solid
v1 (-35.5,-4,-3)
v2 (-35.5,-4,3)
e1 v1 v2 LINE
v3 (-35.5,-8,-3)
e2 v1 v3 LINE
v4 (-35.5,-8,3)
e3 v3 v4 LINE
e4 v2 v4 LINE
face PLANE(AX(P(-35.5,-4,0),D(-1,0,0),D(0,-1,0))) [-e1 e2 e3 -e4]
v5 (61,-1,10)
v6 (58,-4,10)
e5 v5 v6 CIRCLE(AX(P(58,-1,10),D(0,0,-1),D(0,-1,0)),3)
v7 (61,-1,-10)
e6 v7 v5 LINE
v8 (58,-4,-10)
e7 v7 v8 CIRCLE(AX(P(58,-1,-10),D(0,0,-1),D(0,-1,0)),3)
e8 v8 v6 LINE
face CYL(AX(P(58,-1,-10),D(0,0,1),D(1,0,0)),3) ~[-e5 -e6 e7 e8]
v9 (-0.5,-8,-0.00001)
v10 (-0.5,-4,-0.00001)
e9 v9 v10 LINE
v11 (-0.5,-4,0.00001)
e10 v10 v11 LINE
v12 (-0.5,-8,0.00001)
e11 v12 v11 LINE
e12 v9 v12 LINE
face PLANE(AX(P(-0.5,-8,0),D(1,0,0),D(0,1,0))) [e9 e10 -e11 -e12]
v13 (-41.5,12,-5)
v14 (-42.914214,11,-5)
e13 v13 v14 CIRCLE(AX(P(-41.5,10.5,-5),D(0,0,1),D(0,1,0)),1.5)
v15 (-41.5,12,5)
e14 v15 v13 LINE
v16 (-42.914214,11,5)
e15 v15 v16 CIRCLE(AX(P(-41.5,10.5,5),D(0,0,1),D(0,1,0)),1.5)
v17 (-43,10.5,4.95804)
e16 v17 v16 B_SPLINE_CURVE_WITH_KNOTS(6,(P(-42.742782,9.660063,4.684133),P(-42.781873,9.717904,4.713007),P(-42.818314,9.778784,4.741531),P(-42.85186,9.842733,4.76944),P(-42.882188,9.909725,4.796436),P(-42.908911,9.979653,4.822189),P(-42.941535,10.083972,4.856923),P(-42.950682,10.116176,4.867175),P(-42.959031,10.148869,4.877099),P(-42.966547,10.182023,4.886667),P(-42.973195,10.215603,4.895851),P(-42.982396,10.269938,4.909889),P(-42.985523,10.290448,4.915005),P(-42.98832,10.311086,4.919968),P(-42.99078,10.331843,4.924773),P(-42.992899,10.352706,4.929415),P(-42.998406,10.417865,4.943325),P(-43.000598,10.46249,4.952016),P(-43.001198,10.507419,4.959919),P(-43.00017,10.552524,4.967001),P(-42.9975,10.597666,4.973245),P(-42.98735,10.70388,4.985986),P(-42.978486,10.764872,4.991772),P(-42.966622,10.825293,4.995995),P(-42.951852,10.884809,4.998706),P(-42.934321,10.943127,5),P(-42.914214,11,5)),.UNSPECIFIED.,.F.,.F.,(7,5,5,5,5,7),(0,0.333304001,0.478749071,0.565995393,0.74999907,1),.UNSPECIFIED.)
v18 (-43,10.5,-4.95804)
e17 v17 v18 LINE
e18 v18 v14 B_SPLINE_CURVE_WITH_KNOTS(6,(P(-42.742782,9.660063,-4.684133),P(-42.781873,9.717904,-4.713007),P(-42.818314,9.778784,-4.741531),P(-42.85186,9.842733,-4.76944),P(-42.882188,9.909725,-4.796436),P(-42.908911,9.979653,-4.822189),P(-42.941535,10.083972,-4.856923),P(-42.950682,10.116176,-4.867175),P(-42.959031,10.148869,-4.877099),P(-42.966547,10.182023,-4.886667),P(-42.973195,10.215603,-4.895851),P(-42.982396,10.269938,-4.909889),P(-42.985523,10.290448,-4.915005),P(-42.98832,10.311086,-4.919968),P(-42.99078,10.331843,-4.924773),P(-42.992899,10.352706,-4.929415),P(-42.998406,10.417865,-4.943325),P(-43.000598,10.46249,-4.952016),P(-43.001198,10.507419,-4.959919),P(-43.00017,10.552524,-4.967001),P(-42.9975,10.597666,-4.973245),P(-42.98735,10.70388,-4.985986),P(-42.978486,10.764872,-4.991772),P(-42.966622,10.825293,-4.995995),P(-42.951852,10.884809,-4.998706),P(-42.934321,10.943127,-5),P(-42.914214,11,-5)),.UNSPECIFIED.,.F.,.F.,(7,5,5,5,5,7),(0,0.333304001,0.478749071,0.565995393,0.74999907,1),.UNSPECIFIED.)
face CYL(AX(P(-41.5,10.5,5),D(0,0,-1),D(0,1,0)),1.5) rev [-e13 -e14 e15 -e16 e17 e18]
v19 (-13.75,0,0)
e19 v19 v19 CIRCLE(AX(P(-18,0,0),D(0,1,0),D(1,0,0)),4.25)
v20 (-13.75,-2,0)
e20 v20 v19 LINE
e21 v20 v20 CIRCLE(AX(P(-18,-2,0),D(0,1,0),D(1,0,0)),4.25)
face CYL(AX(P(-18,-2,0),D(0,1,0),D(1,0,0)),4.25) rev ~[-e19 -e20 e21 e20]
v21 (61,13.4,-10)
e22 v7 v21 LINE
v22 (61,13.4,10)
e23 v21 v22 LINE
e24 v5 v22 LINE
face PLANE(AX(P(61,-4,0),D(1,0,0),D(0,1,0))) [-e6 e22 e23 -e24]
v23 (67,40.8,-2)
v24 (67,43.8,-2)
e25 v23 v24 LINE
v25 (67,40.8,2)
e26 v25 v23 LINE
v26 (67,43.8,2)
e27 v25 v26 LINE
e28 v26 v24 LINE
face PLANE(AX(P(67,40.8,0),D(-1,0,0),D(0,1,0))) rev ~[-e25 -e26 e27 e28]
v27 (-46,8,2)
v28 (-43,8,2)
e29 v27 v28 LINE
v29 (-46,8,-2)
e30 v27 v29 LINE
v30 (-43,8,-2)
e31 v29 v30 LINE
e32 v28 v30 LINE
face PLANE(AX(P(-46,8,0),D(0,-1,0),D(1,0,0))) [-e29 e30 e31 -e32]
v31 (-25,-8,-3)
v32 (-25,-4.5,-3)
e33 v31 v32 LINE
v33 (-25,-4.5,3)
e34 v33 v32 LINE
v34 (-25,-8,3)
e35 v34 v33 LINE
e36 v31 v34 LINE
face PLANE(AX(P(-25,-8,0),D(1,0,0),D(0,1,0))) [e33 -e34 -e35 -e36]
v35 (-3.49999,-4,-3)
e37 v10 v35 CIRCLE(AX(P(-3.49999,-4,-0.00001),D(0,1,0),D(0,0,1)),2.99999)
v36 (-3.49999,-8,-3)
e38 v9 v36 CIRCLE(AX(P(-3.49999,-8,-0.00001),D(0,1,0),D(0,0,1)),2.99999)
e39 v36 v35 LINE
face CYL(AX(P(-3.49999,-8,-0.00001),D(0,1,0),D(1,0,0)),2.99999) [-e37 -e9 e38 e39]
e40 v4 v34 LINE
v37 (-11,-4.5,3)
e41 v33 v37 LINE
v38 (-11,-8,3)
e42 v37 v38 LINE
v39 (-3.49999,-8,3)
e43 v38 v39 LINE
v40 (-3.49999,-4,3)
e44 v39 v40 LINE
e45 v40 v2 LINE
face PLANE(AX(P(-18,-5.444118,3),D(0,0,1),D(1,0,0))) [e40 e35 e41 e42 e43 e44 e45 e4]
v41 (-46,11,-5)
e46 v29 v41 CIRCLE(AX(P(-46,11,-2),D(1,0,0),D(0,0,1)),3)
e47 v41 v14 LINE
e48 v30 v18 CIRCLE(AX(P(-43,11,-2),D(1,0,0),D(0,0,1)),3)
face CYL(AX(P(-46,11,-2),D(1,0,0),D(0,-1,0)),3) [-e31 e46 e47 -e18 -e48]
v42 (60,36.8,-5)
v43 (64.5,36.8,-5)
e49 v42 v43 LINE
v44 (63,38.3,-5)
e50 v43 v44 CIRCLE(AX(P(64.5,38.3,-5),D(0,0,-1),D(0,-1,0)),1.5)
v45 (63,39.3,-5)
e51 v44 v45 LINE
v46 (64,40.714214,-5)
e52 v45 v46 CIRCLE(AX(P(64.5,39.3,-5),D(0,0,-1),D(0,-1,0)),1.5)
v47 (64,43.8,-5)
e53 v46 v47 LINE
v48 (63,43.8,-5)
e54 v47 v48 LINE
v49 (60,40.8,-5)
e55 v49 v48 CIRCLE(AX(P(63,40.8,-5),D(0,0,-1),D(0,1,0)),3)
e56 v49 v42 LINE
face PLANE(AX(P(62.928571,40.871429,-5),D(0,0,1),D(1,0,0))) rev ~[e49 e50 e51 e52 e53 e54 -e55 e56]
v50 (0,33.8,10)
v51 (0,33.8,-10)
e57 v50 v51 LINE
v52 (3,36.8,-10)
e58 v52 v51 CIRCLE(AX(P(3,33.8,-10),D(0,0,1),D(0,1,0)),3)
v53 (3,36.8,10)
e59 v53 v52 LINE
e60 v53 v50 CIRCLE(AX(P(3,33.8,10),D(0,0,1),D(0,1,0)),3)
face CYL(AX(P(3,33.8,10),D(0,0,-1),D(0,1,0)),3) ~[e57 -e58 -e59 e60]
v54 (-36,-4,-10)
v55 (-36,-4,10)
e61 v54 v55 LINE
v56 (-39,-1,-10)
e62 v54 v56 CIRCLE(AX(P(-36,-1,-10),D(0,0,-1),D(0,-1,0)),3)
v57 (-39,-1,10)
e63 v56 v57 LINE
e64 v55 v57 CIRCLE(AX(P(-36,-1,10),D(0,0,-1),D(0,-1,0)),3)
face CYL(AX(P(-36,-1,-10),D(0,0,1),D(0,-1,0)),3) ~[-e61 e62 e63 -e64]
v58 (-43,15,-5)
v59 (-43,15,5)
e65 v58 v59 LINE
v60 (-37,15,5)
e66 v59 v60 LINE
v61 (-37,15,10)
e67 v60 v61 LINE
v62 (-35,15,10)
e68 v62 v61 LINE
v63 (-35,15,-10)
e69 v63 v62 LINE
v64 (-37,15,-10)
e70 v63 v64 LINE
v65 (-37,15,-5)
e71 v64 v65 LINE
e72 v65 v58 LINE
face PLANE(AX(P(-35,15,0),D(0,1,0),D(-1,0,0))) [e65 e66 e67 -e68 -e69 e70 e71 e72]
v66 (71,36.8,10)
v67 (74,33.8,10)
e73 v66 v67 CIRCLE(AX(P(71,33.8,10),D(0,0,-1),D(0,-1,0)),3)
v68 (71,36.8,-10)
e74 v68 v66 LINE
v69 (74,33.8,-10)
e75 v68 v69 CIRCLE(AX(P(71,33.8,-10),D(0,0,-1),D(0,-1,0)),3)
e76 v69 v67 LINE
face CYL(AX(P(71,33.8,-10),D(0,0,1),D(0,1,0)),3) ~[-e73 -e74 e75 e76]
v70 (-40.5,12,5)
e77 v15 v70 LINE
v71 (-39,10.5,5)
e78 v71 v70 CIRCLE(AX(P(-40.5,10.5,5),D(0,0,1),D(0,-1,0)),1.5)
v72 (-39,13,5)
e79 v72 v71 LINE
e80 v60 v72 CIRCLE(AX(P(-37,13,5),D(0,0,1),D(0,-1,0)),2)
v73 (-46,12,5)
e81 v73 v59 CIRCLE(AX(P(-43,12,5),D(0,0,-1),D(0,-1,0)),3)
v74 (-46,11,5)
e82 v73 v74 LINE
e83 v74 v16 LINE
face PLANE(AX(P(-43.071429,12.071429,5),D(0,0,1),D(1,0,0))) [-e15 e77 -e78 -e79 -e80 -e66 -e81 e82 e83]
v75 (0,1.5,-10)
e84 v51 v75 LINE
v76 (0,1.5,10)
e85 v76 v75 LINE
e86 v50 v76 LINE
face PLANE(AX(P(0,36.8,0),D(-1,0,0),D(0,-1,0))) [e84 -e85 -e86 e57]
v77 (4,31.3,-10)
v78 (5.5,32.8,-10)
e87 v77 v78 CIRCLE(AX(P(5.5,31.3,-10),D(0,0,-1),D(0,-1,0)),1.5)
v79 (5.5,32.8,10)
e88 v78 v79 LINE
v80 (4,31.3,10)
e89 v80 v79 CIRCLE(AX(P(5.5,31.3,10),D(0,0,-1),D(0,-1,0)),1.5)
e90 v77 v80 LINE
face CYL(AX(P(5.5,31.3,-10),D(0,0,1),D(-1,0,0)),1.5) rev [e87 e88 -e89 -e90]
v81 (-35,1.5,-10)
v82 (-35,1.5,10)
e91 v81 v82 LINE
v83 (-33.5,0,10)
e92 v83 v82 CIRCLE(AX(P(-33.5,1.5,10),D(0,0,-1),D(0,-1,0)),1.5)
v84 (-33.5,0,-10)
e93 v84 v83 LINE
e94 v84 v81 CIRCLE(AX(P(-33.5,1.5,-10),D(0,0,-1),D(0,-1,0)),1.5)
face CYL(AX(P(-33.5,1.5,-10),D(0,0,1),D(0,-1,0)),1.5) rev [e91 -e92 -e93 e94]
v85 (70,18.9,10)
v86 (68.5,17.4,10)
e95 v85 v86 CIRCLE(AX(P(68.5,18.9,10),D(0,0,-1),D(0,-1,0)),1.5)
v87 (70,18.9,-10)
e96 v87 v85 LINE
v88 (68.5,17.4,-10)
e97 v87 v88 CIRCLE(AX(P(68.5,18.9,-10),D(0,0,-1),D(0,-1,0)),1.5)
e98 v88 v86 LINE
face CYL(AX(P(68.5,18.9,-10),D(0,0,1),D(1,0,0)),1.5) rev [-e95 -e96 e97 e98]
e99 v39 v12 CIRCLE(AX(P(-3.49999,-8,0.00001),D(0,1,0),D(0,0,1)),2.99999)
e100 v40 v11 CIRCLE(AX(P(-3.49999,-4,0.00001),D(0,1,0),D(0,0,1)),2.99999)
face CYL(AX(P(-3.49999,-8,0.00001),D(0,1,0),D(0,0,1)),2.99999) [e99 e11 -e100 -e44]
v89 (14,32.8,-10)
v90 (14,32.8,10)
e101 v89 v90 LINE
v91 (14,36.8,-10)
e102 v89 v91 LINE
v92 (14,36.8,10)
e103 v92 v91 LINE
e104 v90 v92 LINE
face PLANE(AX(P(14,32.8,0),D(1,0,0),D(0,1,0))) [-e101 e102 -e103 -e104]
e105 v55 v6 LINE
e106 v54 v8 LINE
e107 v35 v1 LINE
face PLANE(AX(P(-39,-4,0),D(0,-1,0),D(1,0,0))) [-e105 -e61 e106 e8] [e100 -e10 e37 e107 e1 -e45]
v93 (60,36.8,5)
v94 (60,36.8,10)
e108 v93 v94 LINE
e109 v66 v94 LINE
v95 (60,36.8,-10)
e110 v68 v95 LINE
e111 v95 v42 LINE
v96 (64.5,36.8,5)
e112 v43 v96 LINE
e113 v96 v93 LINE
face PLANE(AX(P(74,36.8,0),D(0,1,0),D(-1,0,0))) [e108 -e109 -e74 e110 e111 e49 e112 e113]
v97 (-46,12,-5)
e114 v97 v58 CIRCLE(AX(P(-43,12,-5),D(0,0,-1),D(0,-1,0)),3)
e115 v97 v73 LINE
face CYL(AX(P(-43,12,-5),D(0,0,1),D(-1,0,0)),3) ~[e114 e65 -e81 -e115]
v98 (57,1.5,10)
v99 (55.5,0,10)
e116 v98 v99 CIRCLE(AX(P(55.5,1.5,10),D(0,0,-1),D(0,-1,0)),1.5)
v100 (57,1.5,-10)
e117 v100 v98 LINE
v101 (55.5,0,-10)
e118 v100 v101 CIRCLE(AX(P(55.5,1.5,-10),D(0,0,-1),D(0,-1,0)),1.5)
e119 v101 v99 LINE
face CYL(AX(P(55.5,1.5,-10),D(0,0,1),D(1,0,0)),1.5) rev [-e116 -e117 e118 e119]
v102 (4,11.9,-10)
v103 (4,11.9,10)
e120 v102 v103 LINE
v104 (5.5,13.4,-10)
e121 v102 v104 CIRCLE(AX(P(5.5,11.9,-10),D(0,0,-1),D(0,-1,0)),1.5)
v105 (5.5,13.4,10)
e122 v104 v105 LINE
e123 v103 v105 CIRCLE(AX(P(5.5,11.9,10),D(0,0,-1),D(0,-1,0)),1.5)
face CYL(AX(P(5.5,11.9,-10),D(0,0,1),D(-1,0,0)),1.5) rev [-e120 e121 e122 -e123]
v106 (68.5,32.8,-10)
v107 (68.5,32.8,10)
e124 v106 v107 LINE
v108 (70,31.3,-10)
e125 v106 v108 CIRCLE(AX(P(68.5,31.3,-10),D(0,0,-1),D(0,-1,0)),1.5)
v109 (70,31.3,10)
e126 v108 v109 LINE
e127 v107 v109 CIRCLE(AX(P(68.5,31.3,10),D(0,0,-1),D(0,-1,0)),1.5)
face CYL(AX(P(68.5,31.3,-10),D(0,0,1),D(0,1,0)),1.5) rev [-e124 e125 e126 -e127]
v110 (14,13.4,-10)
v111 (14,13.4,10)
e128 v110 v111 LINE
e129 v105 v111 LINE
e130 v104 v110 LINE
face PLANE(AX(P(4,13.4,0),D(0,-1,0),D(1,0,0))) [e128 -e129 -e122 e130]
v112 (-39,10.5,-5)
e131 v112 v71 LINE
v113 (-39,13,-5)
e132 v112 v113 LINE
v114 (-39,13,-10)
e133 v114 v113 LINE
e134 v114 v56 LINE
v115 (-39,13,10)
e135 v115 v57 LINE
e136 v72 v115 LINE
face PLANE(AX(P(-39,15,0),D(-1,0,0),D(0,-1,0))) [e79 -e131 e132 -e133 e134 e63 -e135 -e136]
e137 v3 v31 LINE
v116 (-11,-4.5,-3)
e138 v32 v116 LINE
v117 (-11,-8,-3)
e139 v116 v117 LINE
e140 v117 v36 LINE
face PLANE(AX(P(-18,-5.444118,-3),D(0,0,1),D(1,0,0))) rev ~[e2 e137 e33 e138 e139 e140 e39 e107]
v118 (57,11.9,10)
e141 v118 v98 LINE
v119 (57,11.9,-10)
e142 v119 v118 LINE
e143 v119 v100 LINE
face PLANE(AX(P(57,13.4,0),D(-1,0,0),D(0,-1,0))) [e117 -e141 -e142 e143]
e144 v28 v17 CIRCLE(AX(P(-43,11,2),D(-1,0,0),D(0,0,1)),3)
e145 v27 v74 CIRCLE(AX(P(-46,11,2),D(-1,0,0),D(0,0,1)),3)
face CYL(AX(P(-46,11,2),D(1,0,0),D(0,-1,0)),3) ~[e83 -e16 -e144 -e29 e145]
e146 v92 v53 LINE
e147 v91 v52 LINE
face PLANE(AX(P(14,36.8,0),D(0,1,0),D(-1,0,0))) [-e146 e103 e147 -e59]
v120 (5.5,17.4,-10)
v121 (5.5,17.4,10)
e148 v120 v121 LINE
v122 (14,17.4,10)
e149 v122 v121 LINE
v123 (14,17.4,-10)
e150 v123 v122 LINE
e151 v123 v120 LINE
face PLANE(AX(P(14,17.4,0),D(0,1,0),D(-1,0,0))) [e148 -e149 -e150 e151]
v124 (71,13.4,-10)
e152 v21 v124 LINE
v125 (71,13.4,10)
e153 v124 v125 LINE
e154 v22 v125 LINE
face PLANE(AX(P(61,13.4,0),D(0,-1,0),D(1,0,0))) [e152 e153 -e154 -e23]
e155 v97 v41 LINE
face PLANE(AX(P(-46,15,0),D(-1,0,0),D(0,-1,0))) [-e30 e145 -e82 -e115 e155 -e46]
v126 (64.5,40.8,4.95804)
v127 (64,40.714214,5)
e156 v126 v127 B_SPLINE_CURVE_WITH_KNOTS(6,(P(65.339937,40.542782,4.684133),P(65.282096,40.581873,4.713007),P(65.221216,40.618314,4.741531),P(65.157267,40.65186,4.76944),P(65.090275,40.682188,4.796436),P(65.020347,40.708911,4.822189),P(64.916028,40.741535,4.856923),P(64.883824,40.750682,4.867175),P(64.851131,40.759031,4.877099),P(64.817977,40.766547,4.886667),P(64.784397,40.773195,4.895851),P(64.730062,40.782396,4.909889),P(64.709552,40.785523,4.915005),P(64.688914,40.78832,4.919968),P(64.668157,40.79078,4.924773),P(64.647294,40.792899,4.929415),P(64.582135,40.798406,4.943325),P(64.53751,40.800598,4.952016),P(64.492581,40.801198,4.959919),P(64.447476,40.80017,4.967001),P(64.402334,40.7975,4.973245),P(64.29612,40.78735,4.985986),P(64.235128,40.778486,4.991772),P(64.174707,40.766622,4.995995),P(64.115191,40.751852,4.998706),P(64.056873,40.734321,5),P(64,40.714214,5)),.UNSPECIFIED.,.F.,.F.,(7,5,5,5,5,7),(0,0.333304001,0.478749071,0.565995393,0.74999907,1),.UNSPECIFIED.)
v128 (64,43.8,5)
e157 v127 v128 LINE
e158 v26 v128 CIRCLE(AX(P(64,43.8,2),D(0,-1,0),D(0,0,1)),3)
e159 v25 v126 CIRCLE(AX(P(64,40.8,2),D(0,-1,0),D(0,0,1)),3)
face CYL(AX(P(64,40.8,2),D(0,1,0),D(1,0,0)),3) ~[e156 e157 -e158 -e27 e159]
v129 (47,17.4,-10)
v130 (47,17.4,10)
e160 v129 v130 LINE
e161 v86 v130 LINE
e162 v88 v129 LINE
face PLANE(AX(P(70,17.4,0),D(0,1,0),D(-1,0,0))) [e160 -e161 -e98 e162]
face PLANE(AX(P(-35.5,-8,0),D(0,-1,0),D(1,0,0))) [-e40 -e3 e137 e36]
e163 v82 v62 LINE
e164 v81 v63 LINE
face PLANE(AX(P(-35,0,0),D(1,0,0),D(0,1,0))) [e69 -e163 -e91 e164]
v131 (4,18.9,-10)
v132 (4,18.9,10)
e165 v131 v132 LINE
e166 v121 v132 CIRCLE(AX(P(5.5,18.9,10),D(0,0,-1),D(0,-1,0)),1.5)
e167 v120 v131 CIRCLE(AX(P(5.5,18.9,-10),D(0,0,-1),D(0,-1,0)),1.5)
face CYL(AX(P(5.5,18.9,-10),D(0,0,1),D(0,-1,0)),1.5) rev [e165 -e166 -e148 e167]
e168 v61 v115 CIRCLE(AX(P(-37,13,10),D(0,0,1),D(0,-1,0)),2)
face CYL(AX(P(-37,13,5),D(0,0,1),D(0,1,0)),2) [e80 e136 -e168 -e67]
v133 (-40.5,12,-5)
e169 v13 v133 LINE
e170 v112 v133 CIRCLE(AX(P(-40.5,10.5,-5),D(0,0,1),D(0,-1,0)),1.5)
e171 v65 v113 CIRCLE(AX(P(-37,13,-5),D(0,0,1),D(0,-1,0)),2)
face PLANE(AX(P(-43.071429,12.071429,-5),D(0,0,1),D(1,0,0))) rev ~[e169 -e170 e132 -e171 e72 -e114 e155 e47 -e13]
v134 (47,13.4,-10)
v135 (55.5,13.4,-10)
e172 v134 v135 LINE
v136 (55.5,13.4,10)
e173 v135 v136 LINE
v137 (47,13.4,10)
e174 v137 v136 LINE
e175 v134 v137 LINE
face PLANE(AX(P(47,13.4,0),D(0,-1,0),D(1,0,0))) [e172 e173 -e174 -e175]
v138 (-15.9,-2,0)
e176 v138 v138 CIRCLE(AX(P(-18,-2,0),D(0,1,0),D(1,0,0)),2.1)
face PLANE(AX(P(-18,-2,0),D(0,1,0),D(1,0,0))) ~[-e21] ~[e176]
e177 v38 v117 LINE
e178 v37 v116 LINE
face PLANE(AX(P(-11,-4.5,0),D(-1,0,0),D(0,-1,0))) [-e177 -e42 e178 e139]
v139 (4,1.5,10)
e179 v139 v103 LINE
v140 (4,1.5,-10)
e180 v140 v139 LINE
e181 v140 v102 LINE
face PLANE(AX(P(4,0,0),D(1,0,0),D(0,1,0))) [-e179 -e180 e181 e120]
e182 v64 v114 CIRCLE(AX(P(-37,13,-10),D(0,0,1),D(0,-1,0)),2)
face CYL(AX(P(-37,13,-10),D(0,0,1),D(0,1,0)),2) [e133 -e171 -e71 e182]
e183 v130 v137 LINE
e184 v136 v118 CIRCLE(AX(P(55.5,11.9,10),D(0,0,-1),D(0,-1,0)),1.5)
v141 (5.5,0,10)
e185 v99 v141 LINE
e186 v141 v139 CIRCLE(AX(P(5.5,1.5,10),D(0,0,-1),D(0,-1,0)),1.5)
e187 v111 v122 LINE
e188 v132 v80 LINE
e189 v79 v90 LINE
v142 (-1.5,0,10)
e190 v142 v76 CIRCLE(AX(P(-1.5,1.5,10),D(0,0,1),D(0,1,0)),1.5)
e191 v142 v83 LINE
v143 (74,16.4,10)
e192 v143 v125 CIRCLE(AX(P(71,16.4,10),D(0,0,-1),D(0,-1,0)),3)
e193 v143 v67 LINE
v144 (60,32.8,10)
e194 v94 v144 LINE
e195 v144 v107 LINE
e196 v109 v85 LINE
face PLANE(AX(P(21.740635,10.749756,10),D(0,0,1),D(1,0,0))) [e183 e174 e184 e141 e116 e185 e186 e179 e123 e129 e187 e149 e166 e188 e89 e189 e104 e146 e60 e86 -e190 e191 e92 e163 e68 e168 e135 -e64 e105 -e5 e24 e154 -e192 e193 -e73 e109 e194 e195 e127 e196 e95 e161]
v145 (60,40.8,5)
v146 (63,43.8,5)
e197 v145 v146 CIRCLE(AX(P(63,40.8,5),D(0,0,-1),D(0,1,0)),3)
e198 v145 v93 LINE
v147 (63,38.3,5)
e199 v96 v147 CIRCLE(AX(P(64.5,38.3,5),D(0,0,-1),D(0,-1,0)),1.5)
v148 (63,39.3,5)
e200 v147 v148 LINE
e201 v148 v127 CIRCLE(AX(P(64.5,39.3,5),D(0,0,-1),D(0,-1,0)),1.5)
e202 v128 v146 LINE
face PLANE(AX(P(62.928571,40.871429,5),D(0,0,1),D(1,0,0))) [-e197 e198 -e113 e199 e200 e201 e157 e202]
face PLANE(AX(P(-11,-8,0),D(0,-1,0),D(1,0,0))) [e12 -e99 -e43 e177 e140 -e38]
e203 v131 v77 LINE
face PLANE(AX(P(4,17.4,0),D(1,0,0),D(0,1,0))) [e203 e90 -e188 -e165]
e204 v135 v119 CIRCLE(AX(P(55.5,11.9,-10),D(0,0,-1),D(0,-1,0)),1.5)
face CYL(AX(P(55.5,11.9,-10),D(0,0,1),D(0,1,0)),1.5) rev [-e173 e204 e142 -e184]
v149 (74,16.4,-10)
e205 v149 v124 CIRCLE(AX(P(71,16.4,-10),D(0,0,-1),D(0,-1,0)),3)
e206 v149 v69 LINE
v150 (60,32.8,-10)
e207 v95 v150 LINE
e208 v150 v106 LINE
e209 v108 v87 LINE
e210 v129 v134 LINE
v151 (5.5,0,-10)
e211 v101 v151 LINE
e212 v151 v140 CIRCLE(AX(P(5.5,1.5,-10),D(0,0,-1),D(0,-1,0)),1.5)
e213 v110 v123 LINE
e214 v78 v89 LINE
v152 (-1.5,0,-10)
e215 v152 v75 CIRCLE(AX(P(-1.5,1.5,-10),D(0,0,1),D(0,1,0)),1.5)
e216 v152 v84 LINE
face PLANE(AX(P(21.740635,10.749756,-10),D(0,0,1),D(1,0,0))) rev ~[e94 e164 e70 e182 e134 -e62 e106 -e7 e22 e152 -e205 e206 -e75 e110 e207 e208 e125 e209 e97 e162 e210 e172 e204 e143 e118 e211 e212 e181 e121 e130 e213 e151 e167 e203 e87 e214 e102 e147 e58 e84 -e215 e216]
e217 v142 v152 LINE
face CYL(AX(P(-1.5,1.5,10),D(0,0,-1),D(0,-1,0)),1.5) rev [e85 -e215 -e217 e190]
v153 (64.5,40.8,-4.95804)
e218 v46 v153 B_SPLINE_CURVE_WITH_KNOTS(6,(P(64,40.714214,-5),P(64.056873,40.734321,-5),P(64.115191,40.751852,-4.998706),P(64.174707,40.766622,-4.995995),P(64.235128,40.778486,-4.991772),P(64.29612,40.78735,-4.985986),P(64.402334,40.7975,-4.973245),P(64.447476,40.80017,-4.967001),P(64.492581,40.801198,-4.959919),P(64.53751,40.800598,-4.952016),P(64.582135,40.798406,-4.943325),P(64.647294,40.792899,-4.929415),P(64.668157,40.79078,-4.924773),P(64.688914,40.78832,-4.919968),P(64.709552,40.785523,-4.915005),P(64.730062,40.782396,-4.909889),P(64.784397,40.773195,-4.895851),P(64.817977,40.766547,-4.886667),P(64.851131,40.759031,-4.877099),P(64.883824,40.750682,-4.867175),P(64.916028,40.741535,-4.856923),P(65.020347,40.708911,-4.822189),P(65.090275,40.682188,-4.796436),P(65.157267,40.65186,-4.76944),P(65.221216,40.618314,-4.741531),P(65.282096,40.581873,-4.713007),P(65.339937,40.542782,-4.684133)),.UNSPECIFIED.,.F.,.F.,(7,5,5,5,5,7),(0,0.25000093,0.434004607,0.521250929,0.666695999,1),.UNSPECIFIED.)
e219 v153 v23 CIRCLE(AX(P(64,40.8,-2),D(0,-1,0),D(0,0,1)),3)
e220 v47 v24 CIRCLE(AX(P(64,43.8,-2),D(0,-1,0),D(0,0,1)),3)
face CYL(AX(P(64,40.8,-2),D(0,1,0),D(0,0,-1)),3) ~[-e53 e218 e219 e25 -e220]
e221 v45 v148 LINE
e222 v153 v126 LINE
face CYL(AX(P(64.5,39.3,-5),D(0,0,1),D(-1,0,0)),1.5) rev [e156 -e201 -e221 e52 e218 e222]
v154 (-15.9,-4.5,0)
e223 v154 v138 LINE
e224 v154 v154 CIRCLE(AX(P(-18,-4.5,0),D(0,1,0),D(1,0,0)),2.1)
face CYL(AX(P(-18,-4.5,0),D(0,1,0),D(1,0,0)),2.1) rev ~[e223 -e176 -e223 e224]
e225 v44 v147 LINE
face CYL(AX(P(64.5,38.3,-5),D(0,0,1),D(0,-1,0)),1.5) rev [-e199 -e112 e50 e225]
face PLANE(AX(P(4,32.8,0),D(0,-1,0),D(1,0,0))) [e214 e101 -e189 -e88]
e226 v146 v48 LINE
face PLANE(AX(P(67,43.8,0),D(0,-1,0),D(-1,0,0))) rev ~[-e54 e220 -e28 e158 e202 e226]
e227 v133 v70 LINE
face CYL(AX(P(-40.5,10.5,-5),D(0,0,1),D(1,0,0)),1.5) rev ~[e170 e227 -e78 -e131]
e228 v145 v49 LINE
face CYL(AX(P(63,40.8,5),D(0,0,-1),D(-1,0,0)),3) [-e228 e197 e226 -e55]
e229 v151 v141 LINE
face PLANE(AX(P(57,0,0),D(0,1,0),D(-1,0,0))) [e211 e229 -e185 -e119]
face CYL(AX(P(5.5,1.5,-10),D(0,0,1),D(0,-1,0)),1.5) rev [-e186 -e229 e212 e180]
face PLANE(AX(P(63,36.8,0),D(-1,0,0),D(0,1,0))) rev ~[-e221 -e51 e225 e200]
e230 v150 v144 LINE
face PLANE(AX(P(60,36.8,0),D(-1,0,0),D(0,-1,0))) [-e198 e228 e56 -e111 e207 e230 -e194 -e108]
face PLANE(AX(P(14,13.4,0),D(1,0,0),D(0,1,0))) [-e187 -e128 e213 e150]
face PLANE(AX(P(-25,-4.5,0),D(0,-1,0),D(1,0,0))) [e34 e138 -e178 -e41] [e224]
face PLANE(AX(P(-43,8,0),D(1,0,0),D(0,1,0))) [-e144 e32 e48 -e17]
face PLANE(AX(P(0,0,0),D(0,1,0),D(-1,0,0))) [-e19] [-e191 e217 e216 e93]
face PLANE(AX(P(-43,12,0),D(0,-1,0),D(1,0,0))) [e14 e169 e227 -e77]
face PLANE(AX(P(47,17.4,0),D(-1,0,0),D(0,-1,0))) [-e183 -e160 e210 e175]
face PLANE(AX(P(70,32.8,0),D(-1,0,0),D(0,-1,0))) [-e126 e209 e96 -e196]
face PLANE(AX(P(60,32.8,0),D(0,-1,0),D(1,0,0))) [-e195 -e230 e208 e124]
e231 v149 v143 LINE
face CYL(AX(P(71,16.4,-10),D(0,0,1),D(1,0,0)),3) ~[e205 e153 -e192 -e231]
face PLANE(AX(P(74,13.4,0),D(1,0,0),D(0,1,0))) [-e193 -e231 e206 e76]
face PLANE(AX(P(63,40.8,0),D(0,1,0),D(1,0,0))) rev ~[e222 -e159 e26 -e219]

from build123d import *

# Parameters (mm, degrees)
F1_DEPTH = 10
F3_DEPTH = 5
F4_R     = 1.5
F5_R     = 3
F7_DEPTH = 3
F10_R    = 2
F11_R    = 2.99999


# Not quite as in the source:
# - a fillet or chamfer is up to 0.001 mm smaller than in the source, because OpenCascade refuses the exact size


with BuildPart() as f1:
    # F0 (on Top) → F1 (new body, symmetric)
    with BuildSketch(Plane.XY):
        Polygon((0, 0), (-35, 0), (-35, 15), (-39, 15), (-39, -4), (61, -4), (61, 13.4), (74, 13.4), (74, 36.8), (60, 36.8), (60, 32.8), (70, 32.8), (70, 17.4), (47, 17.4), (47, 13.4), (57, 13.4), (57, 0), (4, 0), (4, 13.4), (14, 13.4), (14, 17.4), (4, 17.4), (4, 32.8), (14, 32.8), (14, 36.8), (0, 36.8), align=None)
    extrude(amount=F1_DEPTH, both=True)

    # F2 (on Top) → F3 (join, symmetric)
    with BuildSketch(Plane.XY):
        Polygon((60, 43.8), (60, 36.8), (63, 36.8), (63, 40.8), (67, 40.8), (67, 43.8), align=None)
        Polygon((-43, 12), (-39, 12), (-39, 15), (-46, 15), (-46, 8), (-43, 8), align=None)
    extrude(amount=F3_DEPTH, both=True)

    # F4
    f4_edges = [f1.edges().sort_by_distance(p)[0] for p in [
        (-35, 0, 0),
        (4, 0, 0),
        (4, 17.4, 0),
        (63, 36.8, 0),
        (63, 40.8, 0),
        (4, 32.8, 0),
        (4, 13.4, 0),
        (70, 17.4, 0),
        (57, 0, 0),
        (70, 32.8, 0),
        (57, 13.4, 0),
        (-39, 12, 0),
        (-43, 12, 0),
        (0, 0, 0),
    ]]
    fillet(f4_edges, radius=F4_R)

    # F5
    f5_edges = [f1.edges().sort_by_distance(p)[0] for p in [
        (-39, -4, 0),
        (61, -4, 0),
        (74, 13.4, 0),
        (74, 36.8, 0),
        (60, 43.8, 0),
        (-46, 15, 0),
        (0, 36.8, 0),
        (-44.5, 8, 5),
        (67, 42.3, 5),
        (-44.5, 8, -5),
        (67, 42.3, -5),
    ]]
    fillet(f5_edges, radius=F5_R)

    # F6 (on Top) → F7 (join, symmetric)
    with BuildSketch(Plane.XY):
        Polygon((-11, -8), (-0.5, -8), (-0.5, -4), (-35.5, -4), (-35.5, -8), (-25, -8), (-25, -4.5), (-11, -4.5), align=None)
    extrude(amount=F7_DEPTH, both=True)

    # F8 (on Top) → F9 (revolve, cut)
    with BuildSketch(Plane.XY):
        Polygon((-18, -4.5), (-15.9, -4.5), (-15.9, -2), (-13.75, -2), (-13.75, 0), (-18, 0), align=None)
    revolve(axis=Axis((-18, 1.7481091395, 0), (0, 1, 0)), mode=Mode.SUBTRACT)

    # F10
    f10_edges = [f1.edges().sort_by_distance(p)[0] for p in [
        (-39, 15, -7.5),
        (-39, 15, 7.5),
    ]]
    fillet(f10_edges, radius=F10_R)

    # F11 (radius 3 in the source; OpenCascade refuses exactly that, so slightly less here)
    f11_edges = [f1.edges().sort_by_distance(p)[0] for p in [
        (-0.5, -6, -3),
        (-0.5, -6, 3),
    ]]
    fillet(f11_edges, radius=F11_R)


solid = f1.part
